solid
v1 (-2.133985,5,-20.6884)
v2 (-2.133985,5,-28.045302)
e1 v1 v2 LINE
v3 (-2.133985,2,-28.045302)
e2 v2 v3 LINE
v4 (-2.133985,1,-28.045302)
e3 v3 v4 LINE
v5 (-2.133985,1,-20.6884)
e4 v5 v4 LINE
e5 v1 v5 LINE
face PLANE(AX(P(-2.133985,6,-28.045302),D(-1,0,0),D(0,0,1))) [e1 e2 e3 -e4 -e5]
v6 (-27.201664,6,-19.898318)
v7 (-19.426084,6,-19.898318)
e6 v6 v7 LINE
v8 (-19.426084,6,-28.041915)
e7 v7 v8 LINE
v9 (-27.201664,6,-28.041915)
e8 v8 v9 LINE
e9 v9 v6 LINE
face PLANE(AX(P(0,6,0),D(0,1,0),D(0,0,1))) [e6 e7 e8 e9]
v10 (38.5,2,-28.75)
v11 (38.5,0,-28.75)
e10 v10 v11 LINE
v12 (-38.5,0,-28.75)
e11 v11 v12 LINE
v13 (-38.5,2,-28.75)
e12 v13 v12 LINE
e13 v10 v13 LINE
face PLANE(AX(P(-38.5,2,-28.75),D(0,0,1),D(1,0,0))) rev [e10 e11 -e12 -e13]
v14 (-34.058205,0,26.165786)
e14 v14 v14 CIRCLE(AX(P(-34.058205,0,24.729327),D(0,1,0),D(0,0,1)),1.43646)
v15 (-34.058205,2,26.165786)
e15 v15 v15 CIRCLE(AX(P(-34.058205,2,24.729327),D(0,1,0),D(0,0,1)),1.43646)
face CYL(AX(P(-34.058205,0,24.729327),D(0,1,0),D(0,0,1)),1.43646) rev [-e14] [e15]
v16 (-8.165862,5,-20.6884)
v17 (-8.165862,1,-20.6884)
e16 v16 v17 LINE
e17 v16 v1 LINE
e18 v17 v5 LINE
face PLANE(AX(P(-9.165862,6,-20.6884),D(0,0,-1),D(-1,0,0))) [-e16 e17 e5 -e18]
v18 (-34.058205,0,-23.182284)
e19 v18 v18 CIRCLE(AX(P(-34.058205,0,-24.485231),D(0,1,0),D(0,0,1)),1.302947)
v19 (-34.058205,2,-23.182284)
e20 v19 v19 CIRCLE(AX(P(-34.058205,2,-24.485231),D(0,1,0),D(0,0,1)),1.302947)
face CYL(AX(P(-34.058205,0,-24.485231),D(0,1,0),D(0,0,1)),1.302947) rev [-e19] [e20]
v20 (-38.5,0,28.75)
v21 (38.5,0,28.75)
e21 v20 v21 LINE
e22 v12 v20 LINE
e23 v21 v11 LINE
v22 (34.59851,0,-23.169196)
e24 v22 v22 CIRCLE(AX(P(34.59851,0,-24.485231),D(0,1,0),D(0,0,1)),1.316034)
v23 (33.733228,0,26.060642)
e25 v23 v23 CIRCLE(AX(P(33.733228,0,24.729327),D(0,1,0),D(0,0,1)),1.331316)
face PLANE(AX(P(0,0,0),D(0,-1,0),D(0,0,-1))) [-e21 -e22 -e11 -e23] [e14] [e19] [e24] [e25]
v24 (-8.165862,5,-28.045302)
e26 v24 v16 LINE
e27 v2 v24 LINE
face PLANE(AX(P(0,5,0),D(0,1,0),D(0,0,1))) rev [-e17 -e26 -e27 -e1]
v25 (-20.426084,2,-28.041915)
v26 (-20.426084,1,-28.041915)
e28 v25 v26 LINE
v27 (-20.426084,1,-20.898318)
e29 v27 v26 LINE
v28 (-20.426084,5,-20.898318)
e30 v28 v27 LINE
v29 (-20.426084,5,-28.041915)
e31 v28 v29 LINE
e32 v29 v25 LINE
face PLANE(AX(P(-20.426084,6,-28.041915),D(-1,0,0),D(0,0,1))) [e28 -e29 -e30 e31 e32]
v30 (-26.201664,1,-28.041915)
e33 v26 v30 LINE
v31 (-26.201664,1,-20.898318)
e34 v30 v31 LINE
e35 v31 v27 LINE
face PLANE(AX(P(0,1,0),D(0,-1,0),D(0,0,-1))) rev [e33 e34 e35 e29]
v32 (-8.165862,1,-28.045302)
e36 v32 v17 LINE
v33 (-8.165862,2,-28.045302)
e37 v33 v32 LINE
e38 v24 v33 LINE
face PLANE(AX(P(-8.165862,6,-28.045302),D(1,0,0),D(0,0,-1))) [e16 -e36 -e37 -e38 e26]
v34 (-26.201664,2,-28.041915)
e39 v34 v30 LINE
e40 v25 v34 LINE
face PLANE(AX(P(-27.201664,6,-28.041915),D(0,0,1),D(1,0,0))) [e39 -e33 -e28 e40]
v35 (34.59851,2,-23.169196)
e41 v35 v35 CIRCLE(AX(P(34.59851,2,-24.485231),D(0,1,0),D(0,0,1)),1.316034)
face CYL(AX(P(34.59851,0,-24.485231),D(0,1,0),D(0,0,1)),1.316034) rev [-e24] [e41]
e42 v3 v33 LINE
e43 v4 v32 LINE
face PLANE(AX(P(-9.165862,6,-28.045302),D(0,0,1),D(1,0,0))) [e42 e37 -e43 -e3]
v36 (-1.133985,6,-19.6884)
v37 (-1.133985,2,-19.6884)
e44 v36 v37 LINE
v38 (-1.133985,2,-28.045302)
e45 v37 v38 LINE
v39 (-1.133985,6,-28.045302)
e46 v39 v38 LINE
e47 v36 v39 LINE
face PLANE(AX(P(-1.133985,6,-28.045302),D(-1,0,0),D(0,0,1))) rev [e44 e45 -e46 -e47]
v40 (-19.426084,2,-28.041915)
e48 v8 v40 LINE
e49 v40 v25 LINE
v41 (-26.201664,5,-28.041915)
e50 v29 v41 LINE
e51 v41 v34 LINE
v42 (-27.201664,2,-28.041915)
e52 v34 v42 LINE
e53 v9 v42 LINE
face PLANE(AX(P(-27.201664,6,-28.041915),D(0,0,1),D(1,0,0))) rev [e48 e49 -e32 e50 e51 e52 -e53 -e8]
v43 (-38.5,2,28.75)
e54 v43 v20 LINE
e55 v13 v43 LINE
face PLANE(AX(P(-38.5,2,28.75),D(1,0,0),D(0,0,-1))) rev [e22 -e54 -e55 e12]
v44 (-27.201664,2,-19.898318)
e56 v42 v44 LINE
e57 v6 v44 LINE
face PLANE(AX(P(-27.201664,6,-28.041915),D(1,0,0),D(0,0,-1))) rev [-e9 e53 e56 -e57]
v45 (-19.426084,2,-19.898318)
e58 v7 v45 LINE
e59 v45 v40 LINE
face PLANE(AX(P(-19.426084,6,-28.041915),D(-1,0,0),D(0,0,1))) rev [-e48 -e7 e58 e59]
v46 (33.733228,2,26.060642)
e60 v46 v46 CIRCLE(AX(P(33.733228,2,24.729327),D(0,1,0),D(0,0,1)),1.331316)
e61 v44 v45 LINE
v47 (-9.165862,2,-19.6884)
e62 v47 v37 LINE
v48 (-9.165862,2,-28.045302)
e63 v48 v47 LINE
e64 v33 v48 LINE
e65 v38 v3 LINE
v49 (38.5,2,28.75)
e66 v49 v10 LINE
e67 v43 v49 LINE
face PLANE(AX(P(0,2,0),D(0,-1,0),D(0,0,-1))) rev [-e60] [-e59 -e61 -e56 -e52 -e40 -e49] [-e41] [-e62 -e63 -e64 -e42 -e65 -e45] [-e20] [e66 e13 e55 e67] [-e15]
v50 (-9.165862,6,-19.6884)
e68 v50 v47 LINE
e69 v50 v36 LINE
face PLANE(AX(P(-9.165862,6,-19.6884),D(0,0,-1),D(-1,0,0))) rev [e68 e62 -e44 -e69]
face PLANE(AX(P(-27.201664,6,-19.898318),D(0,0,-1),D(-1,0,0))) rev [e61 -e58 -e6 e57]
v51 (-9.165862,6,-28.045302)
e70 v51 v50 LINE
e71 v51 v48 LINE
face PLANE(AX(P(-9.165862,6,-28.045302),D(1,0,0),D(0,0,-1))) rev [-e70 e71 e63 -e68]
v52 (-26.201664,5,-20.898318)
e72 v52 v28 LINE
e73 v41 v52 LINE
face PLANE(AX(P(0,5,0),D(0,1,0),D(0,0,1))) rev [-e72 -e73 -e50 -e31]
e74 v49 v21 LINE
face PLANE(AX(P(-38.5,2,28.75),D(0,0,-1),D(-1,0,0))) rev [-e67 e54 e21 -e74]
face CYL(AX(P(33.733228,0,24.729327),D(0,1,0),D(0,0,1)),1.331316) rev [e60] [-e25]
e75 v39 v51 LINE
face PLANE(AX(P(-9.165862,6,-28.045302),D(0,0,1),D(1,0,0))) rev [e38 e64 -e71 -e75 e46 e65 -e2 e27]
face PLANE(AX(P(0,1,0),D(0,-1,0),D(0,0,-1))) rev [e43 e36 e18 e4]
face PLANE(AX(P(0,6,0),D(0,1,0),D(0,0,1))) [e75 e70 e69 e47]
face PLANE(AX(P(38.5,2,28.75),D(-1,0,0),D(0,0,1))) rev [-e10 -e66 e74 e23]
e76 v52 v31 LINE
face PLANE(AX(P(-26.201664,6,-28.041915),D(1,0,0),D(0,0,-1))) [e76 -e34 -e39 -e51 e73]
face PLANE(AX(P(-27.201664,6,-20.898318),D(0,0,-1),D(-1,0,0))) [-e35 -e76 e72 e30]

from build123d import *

# Parameters (mm, degrees)
ESBO_O1_W                = 77
ESBO_O1_H                = 57.5
RESSALTO_EXTRUS_O1_DEPTH = 2
ESBO_O2_W                = 7.7755798
ESBO_O2_H                = 8.143597904
ESBO_O2_W_2              = 8.031877
ESBO_O2_H_2              = 8.356901944
RESSALTO_EXTRUS_O2_DEPTH = 4
CASCA1_START             = -28.041915429
CASCA1_OUTLINE_W         = 6.031877
CASCA1_OUTLINE_H         = 4
CASCA1_OUTLINE_W_2       = 5.7755798
CASCA1_DEPTH             = 7.143597904
CASCA1_START_2           = -28.045301573
CASCA1_2_OUTLINE_W       = 6.031877
CASCA1_2_OUTLINE_H       = 4
CASCA1_2_DEPTH           = 7.356901944
ESBO_O3_R                = 1.331315802
ESBO_O3_R_2              = 1.316034484
ESBO_O3_R_3              = 1.436459579
ESBO_O3_R_4              = 1.302946869
CORTE_EXTRUS_O1_DEPTH    = 49.216309481


# Read off the part's stored shape, not the designer's step: Casca1
with BuildPart() as part:
    # Esboço1 → Ressalto-extrusão1 (new body)
    with BuildSketch(Plane(origin=(0, 0, 0), x_dir=(1, 0, 0), z_dir=(0, 1, 0))):
        Rectangle(ESBO_O1_W, ESBO_O1_H)
    extrude(amount=RESSALTO_EXTRUS_O1_DEPTH)

    # Esboço2 → Ressalto-extrusão2 (add)
    with BuildSketch(Plane(origin=(0, 2, 0), x_dir=(1, 0, 0), z_dir=(0, 1, 0))):
        with Locations((-23.313874366, 23.970116477)):
            Rectangle(ESBO_O2_W, ESBO_O2_H)
        with Locations((-5.149923387, 23.866850601)):
            Rectangle(ESBO_O2_W_2, ESBO_O2_H_2)
    extrude(amount=RESSALTO_EXTRUS_O2_DEPTH)

    # Casca1 outline → Casca1 (cut)
    with BuildSketch(Plane.XY.offset(CASCA1_START)):
        with Locations((-5.149923387, 3)):
            Rectangle(CASCA1_OUTLINE_W, CASCA1_OUTLINE_H)
        with Locations((-23.313874366, 3)):
            Rectangle(CASCA1_OUTLINE_W_2, CASCA1_OUTLINE_H)
    extrude(amount=CASCA1_DEPTH, mode=Mode.SUBTRACT)

    # Casca1 2 outline → Casca1 2 (cut)
    with BuildSketch(Plane.XY.offset(CASCA1_START_2)):
        with Locations((-5.149923387, 3)):
            Rectangle(CASCA1_2_OUTLINE_W, CASCA1_2_OUTLINE_H)
    extrude(amount=CASCA1_2_DEPTH, mode=Mode.SUBTRACT)

    # Esboço3 → Corte-extrusão1 (cut, through all)
    with BuildSketch(Plane(origin=(0, 2, 0), x_dir=(1, 0, 0), z_dir=(0, 1, 0))):
        with Locations(Location((33.733228093, -24.729326676, 0), (0, 0, 270))):
            Circle(ESBO_O3_R)
        with Locations(Location((34.598509611, 24.48523075, 0), (0, 0, 270))):
            Circle(ESBO_O3_R_2)
        with Locations(Location((-34.058204813, -24.729326676, 0), (0, 0, 270))):
            Circle(ESBO_O3_R_3)
        with Locations(Location((-34.058204813, 24.48523075, 0), (0, 0, 270))):
            Circle(ESBO_O3_R_4)
    extrude(amount=-CORTE_EXTRUS_O1_DEPTH, mode=Mode.SUBTRACT)


solid = part.part
